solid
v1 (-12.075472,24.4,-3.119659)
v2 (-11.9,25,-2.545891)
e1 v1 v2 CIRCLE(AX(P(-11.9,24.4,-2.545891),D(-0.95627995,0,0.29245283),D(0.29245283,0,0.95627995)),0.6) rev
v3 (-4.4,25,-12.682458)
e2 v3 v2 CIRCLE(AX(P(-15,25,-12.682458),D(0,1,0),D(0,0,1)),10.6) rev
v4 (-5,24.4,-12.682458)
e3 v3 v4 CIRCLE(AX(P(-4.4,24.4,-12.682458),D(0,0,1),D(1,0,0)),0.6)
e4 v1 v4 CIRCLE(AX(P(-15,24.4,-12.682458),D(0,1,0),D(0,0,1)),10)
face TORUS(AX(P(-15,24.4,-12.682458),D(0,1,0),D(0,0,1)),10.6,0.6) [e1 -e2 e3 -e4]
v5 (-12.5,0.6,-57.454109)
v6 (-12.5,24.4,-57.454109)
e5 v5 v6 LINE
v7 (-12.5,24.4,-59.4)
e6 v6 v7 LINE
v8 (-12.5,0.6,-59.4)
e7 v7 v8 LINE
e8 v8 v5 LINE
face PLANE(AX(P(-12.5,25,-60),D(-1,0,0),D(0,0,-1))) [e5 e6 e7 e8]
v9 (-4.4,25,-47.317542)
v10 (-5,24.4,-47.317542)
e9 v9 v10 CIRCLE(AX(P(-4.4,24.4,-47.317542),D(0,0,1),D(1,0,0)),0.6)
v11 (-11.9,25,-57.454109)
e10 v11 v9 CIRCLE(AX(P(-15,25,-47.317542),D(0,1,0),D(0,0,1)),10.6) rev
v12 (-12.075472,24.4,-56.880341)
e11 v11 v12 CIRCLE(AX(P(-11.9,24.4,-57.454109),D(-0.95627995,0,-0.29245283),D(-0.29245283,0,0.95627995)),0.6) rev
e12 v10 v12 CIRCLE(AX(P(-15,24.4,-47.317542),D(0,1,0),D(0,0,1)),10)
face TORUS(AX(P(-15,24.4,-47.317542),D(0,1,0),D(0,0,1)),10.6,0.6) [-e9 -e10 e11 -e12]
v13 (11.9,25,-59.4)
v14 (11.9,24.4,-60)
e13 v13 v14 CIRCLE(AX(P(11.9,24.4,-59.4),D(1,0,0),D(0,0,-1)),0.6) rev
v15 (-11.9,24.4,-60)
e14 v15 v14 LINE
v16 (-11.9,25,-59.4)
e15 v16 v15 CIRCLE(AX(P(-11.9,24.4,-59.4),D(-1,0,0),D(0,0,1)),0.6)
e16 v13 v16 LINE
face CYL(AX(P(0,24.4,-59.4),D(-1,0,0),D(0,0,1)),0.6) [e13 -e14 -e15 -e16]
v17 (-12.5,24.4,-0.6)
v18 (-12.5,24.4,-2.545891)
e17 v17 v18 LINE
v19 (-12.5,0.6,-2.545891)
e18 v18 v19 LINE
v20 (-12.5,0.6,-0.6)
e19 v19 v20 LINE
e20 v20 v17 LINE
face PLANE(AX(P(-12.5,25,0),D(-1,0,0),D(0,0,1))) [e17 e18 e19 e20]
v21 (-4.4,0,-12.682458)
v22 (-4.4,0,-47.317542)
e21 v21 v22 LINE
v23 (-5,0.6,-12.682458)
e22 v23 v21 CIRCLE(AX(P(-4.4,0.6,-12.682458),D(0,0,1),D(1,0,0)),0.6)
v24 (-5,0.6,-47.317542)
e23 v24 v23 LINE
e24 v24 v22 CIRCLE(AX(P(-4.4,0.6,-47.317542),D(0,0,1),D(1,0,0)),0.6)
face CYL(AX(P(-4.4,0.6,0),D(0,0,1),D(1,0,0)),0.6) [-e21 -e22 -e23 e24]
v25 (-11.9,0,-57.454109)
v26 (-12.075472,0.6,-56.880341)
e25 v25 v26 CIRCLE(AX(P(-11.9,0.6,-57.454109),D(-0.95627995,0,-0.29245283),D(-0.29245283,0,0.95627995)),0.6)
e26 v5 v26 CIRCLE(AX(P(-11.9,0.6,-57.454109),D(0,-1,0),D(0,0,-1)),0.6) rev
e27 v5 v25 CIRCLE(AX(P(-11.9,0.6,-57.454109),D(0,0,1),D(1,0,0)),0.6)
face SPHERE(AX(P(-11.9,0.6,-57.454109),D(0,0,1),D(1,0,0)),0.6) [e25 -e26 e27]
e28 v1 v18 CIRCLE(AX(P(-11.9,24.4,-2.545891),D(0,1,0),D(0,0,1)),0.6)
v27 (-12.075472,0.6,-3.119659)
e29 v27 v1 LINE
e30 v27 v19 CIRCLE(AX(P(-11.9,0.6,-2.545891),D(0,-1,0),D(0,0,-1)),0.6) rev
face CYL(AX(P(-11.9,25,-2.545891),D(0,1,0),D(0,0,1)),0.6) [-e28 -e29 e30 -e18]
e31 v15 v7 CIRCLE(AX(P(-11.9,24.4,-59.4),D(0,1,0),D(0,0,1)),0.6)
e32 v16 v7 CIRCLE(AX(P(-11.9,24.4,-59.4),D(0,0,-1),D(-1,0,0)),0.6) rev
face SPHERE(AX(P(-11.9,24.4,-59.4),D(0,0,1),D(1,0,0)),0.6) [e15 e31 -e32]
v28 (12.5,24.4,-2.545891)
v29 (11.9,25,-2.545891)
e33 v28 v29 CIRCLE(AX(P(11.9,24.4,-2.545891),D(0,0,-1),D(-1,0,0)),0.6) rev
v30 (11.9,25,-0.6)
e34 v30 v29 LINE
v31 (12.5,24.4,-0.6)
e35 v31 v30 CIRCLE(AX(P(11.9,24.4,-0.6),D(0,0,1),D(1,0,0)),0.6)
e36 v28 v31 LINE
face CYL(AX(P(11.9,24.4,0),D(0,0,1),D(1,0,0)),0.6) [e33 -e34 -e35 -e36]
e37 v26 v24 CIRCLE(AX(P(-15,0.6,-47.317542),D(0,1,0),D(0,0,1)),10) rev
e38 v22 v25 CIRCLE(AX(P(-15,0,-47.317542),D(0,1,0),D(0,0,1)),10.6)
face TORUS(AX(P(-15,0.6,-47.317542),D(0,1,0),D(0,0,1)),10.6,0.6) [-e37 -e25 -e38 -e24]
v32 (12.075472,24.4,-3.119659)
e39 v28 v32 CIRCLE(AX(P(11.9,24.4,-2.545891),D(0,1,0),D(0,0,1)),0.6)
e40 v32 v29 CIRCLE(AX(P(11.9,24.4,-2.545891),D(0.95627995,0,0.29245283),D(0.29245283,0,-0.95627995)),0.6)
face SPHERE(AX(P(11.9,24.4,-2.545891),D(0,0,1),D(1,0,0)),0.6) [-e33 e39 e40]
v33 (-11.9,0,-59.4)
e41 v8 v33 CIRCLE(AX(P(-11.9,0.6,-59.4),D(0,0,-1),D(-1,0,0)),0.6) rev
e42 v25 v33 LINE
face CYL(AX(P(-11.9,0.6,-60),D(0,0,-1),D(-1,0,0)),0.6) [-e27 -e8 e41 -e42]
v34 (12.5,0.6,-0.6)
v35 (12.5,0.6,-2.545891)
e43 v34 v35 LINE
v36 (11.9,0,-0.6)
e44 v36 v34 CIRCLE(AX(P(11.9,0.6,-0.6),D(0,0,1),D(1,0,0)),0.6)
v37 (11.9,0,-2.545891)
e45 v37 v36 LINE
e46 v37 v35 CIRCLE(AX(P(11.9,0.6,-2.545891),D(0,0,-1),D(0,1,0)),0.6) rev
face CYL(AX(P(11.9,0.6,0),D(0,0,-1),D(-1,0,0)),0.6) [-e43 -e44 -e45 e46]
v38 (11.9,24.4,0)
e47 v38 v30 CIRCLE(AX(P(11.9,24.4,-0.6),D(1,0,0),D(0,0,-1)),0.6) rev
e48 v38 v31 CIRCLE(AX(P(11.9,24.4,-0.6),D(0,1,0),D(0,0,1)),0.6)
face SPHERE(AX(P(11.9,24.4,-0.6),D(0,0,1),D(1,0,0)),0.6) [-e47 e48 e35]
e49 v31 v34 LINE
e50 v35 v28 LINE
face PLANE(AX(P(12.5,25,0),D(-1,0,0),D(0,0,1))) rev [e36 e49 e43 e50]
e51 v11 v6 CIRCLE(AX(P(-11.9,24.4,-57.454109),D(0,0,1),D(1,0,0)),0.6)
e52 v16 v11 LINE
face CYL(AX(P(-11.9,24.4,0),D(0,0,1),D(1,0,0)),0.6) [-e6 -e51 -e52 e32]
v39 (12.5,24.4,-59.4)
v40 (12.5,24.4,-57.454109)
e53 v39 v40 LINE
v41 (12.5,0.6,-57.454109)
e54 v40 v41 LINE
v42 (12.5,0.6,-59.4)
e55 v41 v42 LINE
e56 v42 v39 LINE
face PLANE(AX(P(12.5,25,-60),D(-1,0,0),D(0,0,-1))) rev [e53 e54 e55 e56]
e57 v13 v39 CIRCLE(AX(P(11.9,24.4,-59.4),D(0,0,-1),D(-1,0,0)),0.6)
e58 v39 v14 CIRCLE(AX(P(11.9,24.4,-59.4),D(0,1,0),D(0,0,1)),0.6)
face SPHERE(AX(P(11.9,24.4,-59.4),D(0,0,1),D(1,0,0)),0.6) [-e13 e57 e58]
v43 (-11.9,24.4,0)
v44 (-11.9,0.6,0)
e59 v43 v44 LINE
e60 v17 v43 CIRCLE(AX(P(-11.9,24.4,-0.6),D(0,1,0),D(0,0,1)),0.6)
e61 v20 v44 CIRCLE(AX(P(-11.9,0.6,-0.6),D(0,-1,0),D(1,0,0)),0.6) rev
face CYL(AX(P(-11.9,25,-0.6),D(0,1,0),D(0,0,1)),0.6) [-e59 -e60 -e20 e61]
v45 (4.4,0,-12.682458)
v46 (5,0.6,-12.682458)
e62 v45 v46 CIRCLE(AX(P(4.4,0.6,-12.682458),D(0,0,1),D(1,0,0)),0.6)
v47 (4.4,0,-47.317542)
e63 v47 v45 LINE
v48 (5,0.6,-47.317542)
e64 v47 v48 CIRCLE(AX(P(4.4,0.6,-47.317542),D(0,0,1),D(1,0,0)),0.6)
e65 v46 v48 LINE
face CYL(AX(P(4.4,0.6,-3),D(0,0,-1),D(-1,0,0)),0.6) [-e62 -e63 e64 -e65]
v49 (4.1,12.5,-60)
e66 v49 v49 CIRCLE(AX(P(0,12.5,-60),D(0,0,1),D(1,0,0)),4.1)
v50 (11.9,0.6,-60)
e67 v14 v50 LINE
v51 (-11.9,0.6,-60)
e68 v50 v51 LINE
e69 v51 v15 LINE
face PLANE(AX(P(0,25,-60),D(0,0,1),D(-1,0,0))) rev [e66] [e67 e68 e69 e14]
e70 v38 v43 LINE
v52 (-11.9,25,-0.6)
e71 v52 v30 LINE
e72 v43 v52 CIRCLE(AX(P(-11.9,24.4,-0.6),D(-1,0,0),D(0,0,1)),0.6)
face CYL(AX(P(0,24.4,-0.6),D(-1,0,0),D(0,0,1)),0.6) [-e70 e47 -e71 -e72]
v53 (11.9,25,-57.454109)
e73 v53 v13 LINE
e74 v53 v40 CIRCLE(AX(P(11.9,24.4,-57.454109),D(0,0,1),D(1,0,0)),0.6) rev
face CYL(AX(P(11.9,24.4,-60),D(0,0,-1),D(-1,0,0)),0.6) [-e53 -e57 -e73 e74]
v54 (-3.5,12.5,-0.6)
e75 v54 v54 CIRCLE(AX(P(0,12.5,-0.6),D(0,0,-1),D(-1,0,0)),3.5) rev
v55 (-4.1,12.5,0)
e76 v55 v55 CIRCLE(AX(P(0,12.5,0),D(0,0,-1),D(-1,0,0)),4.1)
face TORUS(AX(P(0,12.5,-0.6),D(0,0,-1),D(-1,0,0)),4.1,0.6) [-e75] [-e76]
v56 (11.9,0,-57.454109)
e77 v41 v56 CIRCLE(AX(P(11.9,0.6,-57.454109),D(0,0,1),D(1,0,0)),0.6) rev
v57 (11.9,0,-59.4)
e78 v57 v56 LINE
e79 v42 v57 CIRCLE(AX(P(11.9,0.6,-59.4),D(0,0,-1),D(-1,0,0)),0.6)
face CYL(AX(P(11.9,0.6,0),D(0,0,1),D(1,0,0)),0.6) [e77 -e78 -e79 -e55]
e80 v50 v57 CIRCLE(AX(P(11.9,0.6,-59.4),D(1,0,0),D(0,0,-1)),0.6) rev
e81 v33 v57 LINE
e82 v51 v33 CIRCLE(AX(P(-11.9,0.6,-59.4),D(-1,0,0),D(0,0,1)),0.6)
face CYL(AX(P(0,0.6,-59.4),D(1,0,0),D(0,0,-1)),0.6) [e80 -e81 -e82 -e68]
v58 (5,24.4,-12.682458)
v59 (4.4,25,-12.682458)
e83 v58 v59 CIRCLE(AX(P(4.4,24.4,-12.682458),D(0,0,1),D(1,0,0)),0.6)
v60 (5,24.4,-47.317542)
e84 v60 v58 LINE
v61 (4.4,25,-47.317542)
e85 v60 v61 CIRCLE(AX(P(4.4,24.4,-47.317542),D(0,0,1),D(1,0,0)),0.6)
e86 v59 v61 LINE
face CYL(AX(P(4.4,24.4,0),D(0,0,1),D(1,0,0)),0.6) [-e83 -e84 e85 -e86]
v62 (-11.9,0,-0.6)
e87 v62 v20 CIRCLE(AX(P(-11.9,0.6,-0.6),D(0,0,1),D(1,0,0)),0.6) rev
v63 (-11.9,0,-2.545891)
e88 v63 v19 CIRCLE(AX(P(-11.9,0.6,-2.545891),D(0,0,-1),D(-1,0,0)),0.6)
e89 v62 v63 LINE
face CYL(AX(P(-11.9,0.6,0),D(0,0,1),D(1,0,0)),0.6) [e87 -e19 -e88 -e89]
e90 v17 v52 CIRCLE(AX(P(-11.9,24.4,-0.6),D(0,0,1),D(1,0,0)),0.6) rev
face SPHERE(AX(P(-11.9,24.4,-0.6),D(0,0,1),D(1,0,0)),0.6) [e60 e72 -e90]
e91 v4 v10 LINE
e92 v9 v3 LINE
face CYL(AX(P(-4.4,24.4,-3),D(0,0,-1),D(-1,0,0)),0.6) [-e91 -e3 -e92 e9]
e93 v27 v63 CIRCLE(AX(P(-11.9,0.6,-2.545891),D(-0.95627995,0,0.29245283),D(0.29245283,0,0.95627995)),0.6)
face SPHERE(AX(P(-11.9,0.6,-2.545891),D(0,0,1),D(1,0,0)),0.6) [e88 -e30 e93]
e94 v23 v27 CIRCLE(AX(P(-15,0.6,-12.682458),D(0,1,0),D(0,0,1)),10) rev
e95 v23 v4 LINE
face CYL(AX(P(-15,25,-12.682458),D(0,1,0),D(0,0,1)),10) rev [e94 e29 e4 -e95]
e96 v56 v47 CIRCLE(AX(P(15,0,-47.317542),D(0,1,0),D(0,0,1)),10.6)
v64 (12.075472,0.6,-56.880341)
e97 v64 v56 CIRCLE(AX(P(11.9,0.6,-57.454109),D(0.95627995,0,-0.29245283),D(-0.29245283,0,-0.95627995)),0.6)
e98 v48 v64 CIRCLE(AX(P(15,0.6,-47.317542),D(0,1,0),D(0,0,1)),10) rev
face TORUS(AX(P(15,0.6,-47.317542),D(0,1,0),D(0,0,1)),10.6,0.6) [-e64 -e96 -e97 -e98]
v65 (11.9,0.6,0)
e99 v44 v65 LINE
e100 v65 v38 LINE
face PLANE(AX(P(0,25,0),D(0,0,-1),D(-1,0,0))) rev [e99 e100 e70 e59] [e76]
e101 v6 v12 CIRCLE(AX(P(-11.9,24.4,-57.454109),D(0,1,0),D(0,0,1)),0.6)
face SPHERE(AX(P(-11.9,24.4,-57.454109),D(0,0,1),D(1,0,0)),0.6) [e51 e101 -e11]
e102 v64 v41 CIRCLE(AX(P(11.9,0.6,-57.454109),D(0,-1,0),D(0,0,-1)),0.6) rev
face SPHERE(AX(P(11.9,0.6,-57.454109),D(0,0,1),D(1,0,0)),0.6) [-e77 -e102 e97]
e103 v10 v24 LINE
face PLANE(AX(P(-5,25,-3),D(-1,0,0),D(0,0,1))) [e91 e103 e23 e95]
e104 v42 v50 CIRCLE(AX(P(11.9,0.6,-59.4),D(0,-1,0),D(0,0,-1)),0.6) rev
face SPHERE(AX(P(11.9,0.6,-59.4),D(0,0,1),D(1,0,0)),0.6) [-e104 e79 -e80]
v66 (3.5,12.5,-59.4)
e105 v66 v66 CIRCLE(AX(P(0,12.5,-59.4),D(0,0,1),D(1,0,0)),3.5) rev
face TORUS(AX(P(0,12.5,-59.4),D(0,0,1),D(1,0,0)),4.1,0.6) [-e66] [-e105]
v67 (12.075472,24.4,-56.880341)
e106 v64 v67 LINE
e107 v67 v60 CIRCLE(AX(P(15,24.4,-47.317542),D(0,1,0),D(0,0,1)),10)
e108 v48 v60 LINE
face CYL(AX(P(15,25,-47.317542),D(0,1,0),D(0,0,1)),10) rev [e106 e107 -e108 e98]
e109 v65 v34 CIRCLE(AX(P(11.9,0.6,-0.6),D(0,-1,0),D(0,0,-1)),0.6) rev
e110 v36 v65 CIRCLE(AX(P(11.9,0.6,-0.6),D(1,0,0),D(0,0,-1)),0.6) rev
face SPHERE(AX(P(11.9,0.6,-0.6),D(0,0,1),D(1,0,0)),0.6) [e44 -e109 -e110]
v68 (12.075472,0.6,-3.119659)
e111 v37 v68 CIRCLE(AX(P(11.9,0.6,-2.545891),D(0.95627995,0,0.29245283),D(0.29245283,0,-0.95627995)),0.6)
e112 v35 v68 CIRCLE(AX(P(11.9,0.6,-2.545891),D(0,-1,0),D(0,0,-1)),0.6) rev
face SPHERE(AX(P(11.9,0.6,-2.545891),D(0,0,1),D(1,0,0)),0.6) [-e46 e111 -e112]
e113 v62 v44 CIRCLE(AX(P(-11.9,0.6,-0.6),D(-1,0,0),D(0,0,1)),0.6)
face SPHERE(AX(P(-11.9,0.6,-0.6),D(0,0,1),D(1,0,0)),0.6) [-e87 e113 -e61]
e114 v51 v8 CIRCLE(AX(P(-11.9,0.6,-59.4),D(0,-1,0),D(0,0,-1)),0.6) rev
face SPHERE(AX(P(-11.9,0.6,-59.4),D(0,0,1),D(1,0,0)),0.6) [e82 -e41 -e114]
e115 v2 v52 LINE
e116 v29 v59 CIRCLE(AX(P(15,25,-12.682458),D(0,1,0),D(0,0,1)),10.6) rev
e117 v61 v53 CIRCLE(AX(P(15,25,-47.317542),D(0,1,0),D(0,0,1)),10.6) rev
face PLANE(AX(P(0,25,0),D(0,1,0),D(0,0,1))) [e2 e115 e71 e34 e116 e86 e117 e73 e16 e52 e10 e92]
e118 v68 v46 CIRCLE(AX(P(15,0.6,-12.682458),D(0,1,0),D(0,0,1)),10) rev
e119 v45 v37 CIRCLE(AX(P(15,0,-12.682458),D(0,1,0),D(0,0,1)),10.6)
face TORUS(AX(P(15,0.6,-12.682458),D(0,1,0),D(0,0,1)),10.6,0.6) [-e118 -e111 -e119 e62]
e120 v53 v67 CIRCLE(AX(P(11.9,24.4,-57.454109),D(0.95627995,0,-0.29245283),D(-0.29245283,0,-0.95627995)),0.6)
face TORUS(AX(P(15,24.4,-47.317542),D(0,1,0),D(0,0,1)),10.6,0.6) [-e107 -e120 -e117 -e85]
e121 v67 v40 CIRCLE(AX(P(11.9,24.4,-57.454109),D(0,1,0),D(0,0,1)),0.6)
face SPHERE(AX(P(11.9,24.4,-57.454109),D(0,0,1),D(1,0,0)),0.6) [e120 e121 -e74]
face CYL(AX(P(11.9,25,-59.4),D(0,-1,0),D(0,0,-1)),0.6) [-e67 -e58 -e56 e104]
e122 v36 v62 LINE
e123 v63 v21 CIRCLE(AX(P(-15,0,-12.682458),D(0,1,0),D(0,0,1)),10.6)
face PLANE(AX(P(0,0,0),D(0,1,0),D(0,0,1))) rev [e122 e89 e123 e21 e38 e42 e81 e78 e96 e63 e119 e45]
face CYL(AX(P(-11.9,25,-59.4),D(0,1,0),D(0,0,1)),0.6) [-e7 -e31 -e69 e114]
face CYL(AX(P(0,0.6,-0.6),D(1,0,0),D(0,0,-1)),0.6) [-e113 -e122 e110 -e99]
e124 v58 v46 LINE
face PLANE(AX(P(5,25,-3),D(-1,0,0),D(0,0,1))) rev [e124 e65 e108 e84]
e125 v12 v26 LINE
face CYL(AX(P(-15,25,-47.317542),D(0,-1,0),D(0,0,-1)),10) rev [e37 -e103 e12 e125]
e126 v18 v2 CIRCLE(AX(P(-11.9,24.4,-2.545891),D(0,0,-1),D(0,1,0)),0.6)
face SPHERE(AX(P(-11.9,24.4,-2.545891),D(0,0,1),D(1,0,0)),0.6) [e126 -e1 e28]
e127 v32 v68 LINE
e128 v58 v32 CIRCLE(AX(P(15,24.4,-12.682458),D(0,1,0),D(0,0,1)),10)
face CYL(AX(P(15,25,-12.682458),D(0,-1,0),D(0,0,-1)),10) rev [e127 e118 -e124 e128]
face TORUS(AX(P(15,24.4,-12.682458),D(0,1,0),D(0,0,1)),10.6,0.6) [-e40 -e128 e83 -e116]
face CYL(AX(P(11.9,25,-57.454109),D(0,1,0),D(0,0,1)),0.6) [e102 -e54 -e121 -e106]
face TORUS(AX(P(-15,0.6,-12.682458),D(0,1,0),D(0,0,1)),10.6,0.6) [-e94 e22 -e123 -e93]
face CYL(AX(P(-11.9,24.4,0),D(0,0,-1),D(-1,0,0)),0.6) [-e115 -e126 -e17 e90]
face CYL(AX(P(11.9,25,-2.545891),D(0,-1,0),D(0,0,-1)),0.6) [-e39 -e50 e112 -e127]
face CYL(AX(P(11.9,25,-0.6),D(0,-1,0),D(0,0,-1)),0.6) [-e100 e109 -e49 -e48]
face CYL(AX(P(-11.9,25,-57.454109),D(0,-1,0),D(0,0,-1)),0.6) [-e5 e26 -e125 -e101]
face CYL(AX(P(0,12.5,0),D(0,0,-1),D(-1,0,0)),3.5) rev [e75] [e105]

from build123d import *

# Parameters (mm, degrees)
SALIENTE_EXTRUIR1_DEPTH = 25
CROQUIS2_R              = 3.5
CORTAR_EXTRUIR1_DEPTH   = 67.191011474
REDONDEO1_R             = 10
REDONDEO2_R             = 0.6


with BuildPart() as part:
    # Croquis1 → Saliente-Extruir1 (new body)
    with BuildSketch(Plane(origin=(0, 0, 0), x_dir=(1, 0, 0), z_dir=(0, 1, 0))):
        Polygon((0, 0), (12.5, 0), (12.5, 3), (5, 3), (5, 30), (0, 30), align=None)
    saliente_extruir1 = extrude(amount=SALIENTE_EXTRUIR1_DEPTH)

    # Simetría1: Saliente-Extruir1 across plane
    add(saliente_extruir1.mirror(Plane(origin=(0, 25, -30), x_dir=(0, 0, 1), z_dir=(1, 0, 0))))

    # Simetría8: part across plane


with BuildPart() as part_1:
    add(part.part)
    add(part.part.mirror(Plane(origin=(5, 25, -30), x_dir=(1, 0, 0), z_dir=(0, 0, 1))))

    # Croquis2 → Cortar-Extruir1 (cut, through all)
    with BuildSketch(Plane(origin=(0, 0, -60), x_dir=(-1, 0, 0), z_dir=(0, 0, -1))):
        with Locations((0, 12.5)):
            Circle(CROQUIS2_R)
    extrude(amount=-CORTAR_EXTRUIR1_DEPTH, mode=Mode.SUBTRACT)

    # Redondeo1
    # the kernel refuses this fillet: 10 mm, written as the material it adds along each edge
    with BuildSketch(Plane(origin=(5, 0, -57), x_dir=(0, 0, 1), z_dir=(0, 1, 0)), Plane(origin=(-5, 0, -3), x_dir=(0, 0, -1), z_dir=(0, 1, 0))) as redondeo1_piece_1:
        with BuildLine():
            CenterArc((9.682458366, 10), REDONDEO1_R, 194.477512186, 75.522487814)
            Line((0, 7.5), (-0.193649167, 7.45))
            ThreePointArc((-0.193649167, 7.45), (-0.2, 3.75), (-0.2, 0))
            Line((-0.2, 0), (0, -0.2))
            Line((0, -0.2), (9.682458366, -0.2))
            Line((9.682458366, -0.2), (9.682458366, 0))
        make_face()
    extrude(amount=25)
    with BuildSketch(Plane(origin=(-5, 0, -57), x_dir=(-1, 0, 0), z_dir=(0, 1, 0)), Plane(origin=(5, 0, -3), x_dir=(1, 0, 0), z_dir=(0, 1, 0))) as redondeo1_piece_2:
        with BuildLine():
            CenterArc((10, 9.682458366), REDONDEO1_R, 180, 75.522487814)
            Line((0, 9.682458366), (-0.2, 9.682458366))
            Line((-0.2, 9.682458366), (-0.2, 0))
            Line((-0.2, 0), (0, -0.2))
            ThreePointArc((0, -0.2), (3.75, -0.2), (7.45, -0.193649167))
            Line((7.45, -0.193649167), (7.5, 0))
        make_face()
    extrude(amount=25)

    # Redondeo2
    redondeo2_edges = [part_1.edges().sort_by_distance(p)[0] for p in [
        (12.5, 12.5, -3),
        (12.5, 12.5, 0),
        (12.5, 25, -1.5),
        (-12.5, 25, -1.5),
        (-12.5, 12.5, -3),
        (-12.5, 12.5, 0),
        (-12.5, 0, -1.5),
        (0, 25, -60),
        (12.5, 12.5, -60),
        (12.5, 25, -58.5),
        (12.5, 12.5, -57),
        (-12.5, 25, -58.5),
        (0, 0, -60),
        (12.5, 0, -58.5),
        (-12.5, 12.5, -57),
        (-12.5, 0, -58.5),
        (-12.5, 12.5, -60),
        (3.5, 12.5, 0),
        (3.5, 12.5, -60),
        (-5, 0, -30),
        (-5, 25, -30),
        (5, 0, -30),
        (5, 25, -30),
        (-7.09430585, 0, -6.558734009),
        (-7.09430585, 25, -6.558734009),
        (7.09430585, 0, -6.558734009),
        (7.09430585, 25, -6.558734009),
        (7.09430585, 0, -53.441265991),
        (7.09430585, 25, -53.441265991),
        (-7.09430585, 0, -53.441265991),
        (-7.09430585, 25, -53.441265991),
        (12.5, 0, -1.5),
        (0, 0, 0),
        (0, 25, 0),
    ]]
    fillet(redondeo2_edges, radius=REDONDEO2_R)


solid = part_1.part
